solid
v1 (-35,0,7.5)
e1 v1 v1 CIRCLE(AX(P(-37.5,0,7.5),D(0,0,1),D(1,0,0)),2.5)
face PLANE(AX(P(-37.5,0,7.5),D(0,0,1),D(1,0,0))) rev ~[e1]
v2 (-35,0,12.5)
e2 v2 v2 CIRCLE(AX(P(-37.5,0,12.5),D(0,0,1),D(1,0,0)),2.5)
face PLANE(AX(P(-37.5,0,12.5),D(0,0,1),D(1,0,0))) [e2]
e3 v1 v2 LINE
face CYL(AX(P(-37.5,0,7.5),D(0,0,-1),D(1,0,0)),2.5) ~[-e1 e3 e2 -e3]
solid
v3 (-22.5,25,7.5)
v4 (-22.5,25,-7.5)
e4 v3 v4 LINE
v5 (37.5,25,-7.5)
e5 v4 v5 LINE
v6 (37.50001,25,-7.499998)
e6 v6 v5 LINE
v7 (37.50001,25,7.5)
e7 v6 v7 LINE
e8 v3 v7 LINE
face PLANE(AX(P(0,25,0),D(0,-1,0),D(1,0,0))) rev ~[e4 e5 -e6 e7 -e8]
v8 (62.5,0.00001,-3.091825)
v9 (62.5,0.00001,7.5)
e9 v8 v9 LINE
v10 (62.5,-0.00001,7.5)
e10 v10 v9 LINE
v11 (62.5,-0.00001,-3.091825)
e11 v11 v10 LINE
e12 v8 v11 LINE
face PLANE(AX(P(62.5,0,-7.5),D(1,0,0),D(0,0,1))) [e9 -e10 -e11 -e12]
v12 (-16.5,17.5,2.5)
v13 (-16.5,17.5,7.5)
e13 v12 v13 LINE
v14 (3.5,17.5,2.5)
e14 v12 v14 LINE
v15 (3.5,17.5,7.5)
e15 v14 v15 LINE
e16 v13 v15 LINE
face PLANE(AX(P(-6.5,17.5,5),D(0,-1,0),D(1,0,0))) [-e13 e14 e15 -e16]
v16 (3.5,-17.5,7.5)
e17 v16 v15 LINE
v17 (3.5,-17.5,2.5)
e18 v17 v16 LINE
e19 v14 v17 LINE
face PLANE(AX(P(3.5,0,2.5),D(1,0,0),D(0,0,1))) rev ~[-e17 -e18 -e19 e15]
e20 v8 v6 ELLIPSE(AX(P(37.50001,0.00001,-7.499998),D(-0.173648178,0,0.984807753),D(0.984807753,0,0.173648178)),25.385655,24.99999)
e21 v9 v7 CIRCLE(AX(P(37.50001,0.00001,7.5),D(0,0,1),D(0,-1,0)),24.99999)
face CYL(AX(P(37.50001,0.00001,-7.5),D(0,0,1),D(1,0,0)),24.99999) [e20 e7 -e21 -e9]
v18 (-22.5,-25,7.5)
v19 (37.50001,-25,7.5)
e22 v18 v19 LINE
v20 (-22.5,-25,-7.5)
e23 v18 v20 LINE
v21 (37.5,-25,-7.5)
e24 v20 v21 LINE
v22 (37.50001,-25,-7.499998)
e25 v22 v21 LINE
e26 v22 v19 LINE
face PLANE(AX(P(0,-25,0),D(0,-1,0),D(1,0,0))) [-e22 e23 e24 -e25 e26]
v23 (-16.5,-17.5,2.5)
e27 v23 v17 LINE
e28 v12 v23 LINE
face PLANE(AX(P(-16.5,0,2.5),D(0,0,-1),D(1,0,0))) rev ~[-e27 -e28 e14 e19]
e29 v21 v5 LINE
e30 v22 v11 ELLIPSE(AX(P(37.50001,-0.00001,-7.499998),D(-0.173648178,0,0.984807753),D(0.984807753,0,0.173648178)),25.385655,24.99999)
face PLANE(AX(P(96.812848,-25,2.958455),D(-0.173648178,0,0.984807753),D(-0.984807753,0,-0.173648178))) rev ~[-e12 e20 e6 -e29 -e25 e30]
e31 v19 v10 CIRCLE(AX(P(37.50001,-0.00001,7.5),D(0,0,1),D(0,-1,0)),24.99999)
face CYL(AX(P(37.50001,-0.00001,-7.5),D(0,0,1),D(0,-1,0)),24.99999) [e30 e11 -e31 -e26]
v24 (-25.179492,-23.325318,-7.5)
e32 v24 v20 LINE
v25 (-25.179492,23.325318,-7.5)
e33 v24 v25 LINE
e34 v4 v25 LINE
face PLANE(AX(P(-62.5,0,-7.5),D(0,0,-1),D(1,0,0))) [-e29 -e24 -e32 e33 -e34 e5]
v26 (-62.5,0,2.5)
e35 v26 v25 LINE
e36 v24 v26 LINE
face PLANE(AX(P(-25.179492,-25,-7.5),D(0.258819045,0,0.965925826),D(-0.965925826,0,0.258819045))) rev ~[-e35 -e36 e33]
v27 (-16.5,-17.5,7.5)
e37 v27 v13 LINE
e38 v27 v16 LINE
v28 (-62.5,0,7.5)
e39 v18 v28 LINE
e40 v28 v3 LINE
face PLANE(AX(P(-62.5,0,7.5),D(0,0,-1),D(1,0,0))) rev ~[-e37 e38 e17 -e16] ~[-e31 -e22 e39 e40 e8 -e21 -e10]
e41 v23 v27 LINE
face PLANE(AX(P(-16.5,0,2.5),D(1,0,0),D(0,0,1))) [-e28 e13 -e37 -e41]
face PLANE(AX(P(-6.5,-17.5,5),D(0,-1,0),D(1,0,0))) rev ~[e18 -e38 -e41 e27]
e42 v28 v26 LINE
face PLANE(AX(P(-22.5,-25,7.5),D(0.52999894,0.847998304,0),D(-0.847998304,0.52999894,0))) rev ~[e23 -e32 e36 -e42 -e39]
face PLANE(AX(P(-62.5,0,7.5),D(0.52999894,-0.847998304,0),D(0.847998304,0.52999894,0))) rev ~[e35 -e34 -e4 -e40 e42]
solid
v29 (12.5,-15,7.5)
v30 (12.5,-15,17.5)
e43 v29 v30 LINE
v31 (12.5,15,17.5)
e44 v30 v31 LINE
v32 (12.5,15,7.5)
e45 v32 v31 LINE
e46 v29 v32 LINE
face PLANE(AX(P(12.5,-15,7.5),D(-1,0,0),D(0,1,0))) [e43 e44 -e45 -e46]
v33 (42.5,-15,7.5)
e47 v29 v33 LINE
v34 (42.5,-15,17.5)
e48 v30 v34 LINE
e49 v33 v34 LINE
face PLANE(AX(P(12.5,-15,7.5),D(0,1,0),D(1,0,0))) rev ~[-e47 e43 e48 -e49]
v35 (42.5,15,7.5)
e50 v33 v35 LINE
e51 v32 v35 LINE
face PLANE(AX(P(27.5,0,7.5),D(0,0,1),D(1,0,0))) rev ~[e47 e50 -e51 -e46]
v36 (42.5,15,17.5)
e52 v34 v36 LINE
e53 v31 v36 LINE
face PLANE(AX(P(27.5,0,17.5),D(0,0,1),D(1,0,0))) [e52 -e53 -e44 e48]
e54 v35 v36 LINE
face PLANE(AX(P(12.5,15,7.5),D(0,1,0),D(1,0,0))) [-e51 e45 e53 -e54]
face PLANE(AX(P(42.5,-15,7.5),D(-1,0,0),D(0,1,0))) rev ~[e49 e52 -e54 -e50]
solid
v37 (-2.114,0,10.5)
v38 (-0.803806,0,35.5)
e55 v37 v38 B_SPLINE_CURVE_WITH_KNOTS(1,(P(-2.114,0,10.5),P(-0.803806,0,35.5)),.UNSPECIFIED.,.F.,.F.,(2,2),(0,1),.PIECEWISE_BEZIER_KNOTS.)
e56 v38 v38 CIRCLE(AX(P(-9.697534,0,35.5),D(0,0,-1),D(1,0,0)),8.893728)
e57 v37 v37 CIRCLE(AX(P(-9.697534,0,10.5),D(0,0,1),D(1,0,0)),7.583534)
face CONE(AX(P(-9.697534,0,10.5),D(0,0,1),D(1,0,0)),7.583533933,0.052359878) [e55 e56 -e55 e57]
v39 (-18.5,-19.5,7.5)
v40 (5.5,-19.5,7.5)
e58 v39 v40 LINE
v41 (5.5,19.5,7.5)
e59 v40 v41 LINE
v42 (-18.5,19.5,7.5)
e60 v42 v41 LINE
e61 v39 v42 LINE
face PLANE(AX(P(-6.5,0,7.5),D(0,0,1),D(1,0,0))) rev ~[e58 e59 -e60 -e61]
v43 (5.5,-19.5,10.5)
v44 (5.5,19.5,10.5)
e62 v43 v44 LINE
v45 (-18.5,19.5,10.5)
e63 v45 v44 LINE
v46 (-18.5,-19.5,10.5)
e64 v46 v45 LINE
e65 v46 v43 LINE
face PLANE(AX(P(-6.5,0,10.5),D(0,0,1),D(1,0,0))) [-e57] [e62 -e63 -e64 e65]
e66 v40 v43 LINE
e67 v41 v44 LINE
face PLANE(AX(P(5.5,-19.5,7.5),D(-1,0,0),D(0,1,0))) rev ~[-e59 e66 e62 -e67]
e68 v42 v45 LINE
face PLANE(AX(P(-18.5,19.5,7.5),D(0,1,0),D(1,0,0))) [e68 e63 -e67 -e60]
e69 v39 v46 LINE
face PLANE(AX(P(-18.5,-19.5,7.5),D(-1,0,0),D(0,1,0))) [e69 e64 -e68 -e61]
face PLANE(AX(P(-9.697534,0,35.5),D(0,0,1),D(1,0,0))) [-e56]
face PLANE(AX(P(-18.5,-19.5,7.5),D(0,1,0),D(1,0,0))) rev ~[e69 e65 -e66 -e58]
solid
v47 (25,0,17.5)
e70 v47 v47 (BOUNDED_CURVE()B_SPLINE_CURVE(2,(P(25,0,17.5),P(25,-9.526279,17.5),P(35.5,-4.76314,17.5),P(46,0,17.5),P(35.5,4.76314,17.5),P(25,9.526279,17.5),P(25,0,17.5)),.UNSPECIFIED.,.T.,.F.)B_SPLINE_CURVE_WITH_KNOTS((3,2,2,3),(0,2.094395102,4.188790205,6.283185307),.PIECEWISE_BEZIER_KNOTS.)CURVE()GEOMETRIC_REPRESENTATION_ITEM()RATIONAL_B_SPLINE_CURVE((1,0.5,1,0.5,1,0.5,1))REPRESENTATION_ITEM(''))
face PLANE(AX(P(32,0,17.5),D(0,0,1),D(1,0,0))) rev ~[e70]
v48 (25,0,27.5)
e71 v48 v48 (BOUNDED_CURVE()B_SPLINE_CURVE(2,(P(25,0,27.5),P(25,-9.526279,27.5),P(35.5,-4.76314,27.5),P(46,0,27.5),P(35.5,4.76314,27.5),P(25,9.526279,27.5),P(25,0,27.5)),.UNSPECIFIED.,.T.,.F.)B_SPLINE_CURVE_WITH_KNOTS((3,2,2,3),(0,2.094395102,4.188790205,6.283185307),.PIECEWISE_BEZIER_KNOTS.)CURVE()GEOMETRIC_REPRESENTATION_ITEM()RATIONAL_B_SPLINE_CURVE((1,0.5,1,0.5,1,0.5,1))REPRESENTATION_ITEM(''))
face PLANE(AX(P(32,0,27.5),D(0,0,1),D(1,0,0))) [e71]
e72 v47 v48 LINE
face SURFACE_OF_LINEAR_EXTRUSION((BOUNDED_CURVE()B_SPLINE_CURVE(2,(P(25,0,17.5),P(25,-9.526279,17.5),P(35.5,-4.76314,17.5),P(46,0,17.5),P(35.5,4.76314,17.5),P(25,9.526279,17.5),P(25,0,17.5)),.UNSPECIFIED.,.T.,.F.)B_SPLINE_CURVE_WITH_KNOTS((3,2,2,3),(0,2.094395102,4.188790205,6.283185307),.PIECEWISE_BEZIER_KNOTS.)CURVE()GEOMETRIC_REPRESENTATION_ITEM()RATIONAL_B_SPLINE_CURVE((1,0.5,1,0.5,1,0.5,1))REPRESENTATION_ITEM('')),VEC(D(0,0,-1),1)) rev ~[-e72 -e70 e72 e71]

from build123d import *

# Parameters (mm, degrees)
F0_W      = 125
F0_H      = 15
F1_DEPTH  = 25
F2_R      = 24.99999
F4_DEPTH  = 50.001
F6_DEPTH  = 25
F8_DEPTH  = 50.001
F9_W      = 30
F9_H      = 30
F10_DEPTH = 10
F11_W     = 20
F11_H     = 5
F12_DEPTH = 17.5
F14_DEPTH = 10
F15_R     = 2.5
F16_DEPTH = 5
F21_DEPTH = 25
F18_W     = 24
F18_H     = 39
F18_W_2   = 20
F18_H_2   = 35
F19_DEPTH = 3
F20_R     = 7.5835339327
F22_DEPTH = 25
F22_TAPER = -3


# Not quite as in the source:
# - a fillet or chamfer is up to 0.001 mm smaller than in the source, because OpenCascade refuses the exact size


with BuildPart() as f1:
    # F0 (on Front) → F1 (new body, symmetric)
    with BuildSketch(Plane.XZ):
        Rectangle(F0_W, F0_H)
    extrude(amount=F1_DEPTH, both=True)

    # F2 (radius 25 in the source; OpenCascade refuses exactly that, so slightly less here)
    f2_edges = [f1.edges().sort_by_distance(p)[0] for p in [
        (62.5, -25, 0),
        (62.5, 25, 0),
    ]]
    fillet(f2_edges, radius=F2_R)

    # F3 (on face) → F4 (cut, through all)
    with BuildSketch(Plane.XZ.offset(25)):
        Polygon((-25.1794919243, -7.5), (-62.5, 2.5), (-62.5, -7.5), align=None)
    extrude(amount=-F4_DEPTH, mode=Mode.SUBTRACT)

    # F5 (on face) → F6 (cut)
    with BuildSketch(Plane.XY.offset(7.5)):
        Polygon((-22.5, -25), (-62.5, 0), (-62.5, -25), align=None)
        Polygon((-62.5, 25), (-62.5, 0), (-22.5, 25), align=None)
    extrude(amount=-F6_DEPTH, mode=Mode.SUBTRACT)

    # F7 (on face) → F8 (cut, through all)
    with BuildSketch(Plane.XZ.offset(25)):
        Polygon((96.8128483375, 2.9584554646), (37.5, -7.5), (96.8128483375, -7.5), align=None)
    extrude(amount=-F8_DEPTH, mode=Mode.SUBTRACT)

    # F11 (on Front) → F12 (cut, symmetric)
    with BuildSketch(Plane.XZ):
        with Locations((-6.5, 5)):
            Rectangle(F11_W, F11_H)
    extrude(amount=F12_DEPTH, both=True, mode=Mode.SUBTRACT)


with BuildPart() as f10:
    # F9 (on face) → F10 (new body)
    with BuildSketch(Plane.XY.offset(7.5)):
        with Locations((27.5, 0)):
            Rectangle(F9_W, F9_H)
    extrude(amount=F10_DEPTH)


with BuildPart() as f14:
    # F13 (on face) → F14 (new body)
    with BuildSketch(Plane.XY.offset(17.5)):
        with BuildLine():
            add(Edge.make_bspline(
                [(25, 0), (25, -9.5262794416), (35.5, -4.7631397208), (46, 0), (35.5, 4.7631397208), (25, 9.5262794416), (25, 0)],
                knots=[0, 0, 0, 2.0943951024, 2.0943951024, 4.1887902048, 4.1887902048, 6.2831853072, 6.2831853072, 6.2831853072], degree=2, weights=[1, 0.5, 1, 0.5, 1, 0.5, 1]))
        make_face()
    extrude(amount=F14_DEPTH)


with BuildPart() as f16:
    # F15 (on face) → F16 (new body)
    with BuildSketch(Plane.XY.offset(7.5)):
        with Locations((-37.5, 0)):
            Circle(F15_R)
    extrude(amount=F16_DEPTH)


with BuildPart() as f21:
    # F21 (new): a face of the model
    f21_faces = [f1.part.faces().sort_by_distance(p)[0] for p in [
        (8.9797168321, 0, 7.5),
    ]]
    extrude(f21_faces, amount=F21_DEPTH)


with BuildPart() as f19:
    # F18 (on face) → F19 (new body)
    with BuildSketch(Plane.XY.offset(7.5)):
        with Locations((-6.5, 0)):
            Rectangle(F18_W, F18_H)
        with Locations((-6.5, 0)):
            Rectangle(F18_W_2, F18_H_2, mode=Mode.SUBTRACT)
        with Locations((-6.5, 0)):
            Rectangle(F18_W_2, F18_H_2)
    extrude(amount=F19_DEPTH)

    # F20 (on face) → F22 (join)
    with BuildSketch(Plane.XY.offset(10.5)):
        with Locations((-9.6975341439, 0)):
            Circle(F20_R)
    extrude(amount=F22_DEPTH, taper=F22_TAPER)


solid = Compound([f1.part, f10.part, f14.part, f16.part, f19.part])
